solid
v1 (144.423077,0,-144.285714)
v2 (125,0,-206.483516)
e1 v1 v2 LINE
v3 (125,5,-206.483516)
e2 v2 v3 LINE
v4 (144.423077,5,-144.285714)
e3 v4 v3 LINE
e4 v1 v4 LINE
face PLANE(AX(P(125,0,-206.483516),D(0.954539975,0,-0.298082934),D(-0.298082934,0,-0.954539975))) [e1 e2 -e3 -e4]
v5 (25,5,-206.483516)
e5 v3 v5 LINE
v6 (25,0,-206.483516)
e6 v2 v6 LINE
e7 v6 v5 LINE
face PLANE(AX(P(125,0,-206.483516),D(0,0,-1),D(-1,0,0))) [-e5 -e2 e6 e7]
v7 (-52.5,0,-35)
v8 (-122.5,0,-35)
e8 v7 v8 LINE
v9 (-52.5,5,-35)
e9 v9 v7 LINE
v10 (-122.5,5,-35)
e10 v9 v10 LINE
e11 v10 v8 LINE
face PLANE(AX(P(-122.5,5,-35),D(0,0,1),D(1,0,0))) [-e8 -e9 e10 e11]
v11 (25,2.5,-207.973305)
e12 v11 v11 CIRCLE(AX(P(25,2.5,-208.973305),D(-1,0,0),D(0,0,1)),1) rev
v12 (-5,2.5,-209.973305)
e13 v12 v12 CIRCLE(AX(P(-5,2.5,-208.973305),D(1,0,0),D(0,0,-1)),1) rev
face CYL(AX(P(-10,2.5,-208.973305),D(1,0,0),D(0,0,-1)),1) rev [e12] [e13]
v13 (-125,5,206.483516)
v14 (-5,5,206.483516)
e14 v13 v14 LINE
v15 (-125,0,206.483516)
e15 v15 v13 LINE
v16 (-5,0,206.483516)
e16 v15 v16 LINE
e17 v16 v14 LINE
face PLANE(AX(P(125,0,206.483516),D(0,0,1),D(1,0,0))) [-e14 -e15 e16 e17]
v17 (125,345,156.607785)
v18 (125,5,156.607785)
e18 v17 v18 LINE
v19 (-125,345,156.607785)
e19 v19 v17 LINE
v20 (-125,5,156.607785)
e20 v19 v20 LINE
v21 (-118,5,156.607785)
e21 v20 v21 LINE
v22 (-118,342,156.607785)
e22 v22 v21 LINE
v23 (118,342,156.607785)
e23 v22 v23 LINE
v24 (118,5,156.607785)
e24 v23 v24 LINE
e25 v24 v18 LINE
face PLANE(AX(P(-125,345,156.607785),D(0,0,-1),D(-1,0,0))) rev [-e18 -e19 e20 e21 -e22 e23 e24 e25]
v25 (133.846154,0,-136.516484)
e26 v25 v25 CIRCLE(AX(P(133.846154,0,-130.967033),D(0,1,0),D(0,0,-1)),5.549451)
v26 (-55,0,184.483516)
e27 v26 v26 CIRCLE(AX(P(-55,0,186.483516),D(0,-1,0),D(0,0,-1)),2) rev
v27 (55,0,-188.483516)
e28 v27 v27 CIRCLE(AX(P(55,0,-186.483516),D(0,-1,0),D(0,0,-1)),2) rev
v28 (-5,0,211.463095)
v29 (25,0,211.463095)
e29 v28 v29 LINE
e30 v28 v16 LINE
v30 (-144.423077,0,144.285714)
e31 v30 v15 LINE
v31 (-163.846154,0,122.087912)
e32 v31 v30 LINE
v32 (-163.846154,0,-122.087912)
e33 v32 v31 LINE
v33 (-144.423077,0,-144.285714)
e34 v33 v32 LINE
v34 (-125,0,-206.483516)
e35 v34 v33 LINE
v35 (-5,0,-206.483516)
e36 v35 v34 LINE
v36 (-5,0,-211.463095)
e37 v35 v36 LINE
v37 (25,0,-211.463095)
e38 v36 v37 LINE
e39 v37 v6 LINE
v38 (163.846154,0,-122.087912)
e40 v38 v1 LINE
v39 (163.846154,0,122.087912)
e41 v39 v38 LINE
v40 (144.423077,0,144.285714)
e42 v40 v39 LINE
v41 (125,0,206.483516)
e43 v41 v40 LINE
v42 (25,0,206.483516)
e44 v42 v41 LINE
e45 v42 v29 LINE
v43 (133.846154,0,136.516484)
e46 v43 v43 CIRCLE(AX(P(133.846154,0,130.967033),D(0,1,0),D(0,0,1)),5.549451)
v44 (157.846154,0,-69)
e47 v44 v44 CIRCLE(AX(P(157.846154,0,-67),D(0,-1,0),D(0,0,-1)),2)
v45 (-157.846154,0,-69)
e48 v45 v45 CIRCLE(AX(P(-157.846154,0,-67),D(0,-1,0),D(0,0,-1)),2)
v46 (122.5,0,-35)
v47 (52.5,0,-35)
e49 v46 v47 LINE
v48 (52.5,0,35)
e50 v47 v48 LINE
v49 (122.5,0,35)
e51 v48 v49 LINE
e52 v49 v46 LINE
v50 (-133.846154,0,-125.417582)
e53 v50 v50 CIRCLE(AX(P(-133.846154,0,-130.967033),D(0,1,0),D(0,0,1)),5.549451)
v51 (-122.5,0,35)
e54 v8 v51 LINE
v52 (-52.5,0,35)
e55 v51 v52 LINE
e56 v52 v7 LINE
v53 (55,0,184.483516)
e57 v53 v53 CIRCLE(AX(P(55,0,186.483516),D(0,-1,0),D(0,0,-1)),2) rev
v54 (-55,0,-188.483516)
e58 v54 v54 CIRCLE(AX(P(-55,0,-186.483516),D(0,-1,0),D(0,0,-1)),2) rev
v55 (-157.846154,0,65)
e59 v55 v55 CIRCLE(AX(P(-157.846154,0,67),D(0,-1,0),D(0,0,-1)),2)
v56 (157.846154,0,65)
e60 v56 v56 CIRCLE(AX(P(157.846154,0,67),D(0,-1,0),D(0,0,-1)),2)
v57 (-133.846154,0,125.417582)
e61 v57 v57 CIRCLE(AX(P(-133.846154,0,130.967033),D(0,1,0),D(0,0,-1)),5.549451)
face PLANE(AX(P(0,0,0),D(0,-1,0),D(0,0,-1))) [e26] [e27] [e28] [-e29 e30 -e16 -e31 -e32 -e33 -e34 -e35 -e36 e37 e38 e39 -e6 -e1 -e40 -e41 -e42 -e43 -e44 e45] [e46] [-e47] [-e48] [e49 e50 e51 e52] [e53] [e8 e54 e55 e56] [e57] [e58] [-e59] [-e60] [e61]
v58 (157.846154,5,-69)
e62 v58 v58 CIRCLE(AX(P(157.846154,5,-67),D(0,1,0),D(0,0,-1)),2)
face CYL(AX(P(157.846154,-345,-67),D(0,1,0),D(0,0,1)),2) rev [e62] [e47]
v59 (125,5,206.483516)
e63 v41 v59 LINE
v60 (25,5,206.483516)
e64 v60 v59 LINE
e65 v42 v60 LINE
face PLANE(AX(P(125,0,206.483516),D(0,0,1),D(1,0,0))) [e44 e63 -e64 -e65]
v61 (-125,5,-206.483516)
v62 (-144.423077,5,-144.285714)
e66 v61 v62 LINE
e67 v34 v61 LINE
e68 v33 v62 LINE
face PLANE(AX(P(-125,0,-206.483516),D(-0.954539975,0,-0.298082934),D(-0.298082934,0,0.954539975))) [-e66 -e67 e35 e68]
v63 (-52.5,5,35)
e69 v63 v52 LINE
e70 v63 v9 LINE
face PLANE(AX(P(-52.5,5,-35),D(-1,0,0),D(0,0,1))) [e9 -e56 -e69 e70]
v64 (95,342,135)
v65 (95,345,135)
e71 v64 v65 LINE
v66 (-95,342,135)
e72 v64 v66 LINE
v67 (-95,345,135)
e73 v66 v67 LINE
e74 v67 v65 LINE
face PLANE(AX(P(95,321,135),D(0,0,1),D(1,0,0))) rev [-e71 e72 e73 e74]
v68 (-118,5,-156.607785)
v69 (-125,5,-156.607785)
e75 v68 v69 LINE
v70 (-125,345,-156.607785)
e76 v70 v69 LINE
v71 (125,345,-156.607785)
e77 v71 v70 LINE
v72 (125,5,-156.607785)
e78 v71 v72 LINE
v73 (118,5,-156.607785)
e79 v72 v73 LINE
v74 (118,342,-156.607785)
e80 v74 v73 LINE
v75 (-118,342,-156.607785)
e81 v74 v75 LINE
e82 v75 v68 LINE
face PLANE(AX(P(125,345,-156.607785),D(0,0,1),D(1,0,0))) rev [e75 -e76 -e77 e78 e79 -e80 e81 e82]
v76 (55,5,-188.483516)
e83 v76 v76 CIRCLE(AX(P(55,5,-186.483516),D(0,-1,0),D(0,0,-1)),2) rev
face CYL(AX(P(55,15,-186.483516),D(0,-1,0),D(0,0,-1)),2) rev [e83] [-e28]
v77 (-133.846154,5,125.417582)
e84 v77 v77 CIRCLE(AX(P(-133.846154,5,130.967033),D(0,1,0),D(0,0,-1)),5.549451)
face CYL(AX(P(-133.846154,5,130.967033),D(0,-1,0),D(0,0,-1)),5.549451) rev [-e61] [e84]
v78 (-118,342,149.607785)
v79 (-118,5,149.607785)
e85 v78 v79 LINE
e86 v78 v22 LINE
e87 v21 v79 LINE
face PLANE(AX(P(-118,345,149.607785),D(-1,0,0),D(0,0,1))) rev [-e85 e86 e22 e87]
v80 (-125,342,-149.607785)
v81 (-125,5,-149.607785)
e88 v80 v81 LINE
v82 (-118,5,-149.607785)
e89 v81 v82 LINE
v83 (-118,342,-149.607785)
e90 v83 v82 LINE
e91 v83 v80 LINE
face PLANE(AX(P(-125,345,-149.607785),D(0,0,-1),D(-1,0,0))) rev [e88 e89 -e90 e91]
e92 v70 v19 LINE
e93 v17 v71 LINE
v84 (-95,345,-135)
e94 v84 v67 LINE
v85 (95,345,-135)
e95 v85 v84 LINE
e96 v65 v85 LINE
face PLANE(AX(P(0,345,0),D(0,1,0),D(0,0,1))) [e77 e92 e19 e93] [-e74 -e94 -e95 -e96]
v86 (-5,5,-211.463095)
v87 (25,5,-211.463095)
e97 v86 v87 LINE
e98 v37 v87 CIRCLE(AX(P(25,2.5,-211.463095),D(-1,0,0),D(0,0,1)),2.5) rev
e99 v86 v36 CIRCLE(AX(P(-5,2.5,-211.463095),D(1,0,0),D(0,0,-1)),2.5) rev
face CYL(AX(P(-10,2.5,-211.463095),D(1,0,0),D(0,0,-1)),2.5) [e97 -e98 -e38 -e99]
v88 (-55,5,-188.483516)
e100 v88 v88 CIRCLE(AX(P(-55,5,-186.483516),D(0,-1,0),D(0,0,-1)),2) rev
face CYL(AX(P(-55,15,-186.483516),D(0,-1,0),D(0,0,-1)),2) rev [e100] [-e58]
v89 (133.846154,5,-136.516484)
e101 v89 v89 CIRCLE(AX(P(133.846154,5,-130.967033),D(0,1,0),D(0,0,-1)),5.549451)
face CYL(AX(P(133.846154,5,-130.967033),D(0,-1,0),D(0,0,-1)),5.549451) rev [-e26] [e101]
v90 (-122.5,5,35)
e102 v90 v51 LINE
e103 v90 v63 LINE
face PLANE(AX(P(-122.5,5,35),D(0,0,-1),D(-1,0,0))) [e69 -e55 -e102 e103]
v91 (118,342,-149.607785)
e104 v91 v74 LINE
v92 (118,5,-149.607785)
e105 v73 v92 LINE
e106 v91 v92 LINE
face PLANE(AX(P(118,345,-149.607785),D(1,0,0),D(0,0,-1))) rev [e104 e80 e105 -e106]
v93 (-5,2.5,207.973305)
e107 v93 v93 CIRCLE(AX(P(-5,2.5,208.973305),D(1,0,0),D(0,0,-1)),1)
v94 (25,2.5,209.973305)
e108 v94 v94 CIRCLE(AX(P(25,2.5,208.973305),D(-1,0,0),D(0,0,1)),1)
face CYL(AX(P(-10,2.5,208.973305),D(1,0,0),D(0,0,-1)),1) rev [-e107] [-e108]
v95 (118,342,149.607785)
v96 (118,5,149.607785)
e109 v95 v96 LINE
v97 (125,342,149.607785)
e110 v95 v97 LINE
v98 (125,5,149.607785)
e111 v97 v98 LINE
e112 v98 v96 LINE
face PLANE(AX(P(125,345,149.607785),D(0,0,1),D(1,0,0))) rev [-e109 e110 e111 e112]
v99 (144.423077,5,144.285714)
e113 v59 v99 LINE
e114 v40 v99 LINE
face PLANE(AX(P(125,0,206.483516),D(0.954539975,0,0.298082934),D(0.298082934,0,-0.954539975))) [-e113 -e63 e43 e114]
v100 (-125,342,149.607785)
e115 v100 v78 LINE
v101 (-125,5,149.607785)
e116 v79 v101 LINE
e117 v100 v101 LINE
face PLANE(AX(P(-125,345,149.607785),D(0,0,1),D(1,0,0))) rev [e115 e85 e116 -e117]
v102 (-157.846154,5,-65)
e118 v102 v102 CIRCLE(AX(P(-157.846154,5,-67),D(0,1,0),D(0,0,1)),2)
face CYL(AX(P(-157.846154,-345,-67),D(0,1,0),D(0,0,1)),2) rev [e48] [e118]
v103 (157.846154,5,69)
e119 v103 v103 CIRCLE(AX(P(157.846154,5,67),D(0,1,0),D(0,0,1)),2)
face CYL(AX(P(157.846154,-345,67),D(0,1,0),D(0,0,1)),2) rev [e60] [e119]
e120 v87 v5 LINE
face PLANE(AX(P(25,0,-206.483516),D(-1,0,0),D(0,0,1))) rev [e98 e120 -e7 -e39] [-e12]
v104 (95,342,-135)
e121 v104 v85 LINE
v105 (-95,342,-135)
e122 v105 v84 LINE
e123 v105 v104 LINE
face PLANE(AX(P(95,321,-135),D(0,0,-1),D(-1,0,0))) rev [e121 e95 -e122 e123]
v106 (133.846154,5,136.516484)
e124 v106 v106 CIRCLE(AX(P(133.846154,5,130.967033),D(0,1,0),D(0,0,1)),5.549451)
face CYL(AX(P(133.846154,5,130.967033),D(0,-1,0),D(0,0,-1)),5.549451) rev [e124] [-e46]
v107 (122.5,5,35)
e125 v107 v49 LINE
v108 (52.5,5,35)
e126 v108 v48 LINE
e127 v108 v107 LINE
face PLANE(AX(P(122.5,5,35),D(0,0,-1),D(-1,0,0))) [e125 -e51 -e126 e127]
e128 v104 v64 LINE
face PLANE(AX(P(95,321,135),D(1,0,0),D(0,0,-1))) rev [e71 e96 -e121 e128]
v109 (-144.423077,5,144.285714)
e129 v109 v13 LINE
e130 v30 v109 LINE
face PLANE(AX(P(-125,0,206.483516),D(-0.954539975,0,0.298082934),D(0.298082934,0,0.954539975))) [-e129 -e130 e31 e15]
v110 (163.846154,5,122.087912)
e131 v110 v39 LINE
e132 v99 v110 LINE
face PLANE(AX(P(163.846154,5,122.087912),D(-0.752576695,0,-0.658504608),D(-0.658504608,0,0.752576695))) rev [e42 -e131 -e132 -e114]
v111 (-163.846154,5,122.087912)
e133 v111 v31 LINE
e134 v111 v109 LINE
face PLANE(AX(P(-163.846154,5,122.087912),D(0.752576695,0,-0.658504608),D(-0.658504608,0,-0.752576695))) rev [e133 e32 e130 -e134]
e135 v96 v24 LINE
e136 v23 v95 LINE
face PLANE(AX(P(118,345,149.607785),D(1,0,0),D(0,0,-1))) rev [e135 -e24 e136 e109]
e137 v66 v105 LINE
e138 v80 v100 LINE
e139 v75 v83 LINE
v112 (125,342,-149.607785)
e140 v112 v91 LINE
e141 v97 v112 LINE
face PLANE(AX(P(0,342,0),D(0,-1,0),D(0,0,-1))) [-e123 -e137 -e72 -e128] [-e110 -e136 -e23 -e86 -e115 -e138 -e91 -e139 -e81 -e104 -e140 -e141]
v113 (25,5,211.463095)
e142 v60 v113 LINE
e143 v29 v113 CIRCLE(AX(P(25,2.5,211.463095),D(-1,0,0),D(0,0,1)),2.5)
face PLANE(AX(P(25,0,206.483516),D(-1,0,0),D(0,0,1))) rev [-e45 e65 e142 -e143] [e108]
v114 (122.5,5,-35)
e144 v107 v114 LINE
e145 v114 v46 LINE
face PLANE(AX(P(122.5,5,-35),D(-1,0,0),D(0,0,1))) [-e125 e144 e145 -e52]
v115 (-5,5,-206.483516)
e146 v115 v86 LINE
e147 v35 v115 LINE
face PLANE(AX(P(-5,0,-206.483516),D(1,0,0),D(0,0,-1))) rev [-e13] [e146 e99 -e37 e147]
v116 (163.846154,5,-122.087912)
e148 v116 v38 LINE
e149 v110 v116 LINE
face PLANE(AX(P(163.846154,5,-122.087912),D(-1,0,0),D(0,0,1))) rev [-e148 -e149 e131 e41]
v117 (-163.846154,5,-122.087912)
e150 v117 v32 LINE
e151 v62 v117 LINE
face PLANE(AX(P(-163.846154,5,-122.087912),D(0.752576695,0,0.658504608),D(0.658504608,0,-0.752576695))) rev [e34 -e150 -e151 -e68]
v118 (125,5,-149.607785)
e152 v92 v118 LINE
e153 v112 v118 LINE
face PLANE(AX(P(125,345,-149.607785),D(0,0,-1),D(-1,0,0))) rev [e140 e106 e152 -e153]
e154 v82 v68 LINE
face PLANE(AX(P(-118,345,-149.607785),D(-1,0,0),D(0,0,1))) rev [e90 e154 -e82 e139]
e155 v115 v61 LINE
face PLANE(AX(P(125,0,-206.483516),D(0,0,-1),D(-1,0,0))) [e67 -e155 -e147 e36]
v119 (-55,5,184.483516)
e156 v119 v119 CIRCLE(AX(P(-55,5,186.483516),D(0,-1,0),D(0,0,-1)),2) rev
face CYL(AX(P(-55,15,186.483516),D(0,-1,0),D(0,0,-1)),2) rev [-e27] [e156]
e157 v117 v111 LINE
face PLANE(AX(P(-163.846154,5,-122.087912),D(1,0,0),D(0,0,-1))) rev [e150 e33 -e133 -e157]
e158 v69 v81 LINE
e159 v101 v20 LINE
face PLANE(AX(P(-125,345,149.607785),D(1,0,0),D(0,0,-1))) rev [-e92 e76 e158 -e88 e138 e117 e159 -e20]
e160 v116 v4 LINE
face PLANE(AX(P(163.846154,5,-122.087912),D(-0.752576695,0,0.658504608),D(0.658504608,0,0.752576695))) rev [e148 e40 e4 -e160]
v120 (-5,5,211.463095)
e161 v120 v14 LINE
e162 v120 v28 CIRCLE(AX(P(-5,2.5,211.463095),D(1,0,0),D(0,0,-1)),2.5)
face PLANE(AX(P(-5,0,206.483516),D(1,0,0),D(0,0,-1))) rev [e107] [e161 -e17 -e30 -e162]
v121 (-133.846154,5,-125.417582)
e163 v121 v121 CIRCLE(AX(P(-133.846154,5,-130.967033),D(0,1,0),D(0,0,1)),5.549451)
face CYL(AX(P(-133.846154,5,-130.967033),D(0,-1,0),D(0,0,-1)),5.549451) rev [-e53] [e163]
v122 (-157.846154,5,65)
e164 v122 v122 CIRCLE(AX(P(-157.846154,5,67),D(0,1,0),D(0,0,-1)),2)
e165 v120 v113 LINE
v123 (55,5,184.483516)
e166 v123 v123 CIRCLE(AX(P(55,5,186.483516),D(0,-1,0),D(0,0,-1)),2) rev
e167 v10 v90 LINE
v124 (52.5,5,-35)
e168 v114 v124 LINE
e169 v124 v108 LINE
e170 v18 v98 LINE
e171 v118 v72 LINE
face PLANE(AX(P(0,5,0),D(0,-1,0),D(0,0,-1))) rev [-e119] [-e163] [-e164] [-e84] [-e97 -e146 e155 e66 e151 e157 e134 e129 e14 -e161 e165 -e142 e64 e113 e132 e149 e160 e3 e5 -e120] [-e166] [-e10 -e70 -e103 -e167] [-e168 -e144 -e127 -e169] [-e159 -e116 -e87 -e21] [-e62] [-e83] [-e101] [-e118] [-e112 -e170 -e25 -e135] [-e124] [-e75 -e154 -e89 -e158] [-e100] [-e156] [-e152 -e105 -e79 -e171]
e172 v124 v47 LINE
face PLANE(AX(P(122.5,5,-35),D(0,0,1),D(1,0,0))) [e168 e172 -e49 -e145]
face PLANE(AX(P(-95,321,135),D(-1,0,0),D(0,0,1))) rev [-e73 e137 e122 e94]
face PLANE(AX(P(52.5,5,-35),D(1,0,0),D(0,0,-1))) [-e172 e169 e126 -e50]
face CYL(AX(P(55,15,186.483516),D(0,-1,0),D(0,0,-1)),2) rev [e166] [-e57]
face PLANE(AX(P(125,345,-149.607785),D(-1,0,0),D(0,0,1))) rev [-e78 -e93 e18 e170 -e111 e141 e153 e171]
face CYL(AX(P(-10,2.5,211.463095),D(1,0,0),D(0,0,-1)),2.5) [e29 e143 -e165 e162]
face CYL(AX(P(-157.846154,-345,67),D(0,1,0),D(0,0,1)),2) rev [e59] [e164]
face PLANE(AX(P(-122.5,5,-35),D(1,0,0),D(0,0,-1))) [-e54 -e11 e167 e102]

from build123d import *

# Parameters (mm, degrees)
ESQUISSE1_R                  = 5.549450549
ESQUISSE1_W                  = 8
ESQUISSE1_H                  = 94.34065934
ESQUISSE1_W_2                = 70
ESQUISSE1_H_2                = 70
BOSS_EXTRU_1_DEPTH           = 5
ESQUISSE4_R                  = 2
ENL_V_MAT_EXTRU_5_DEPTH      = 350
ESQUISSE9_W                  = 8
ESQUISSE9_H                  = 94.34065934
BOSS_EXTRU_2_DEPTH           = 5
BOSS_EXTRU_4_DEPTH           = 5
ESQUISSE11_W                 = 7
ESQUISSE11_H                 = 7
BOSS_EXTRU_6_DEPTH           = 340
ENL_V_MAT_EXTRU_6_DEPTH      = 10
ENL_V_MAT_EXTRU_6_DEPTH_BACK = 10
ESQUISSE12_R                 = 2
ESQUISSE14_R                 = 1
BOSS_EXTRU_8_DEPTH           = 10
SYM_TRIE1_START              = -10
SYM_TRIE1_OUTLINE_R          = 1
SYM_TRIE1_DEPTH              = 40
ESQUISSE15_W                 = 5
ESQUISSE15_H                 = 10.313810077
ENL_V_MAT_EXTRU_7_DEPTH      = 5
ESQUISSE17_W                 = 250
ESQUISSE17_H                 = 313.215569532
BOSS_EXTRU_9_DEPTH           = 3
ESQUISSE18_W                 = 190
ESQUISSE18_H                 = 270
ENL_V_MAT_EXTRU_8_DEPTH      = 24


# Read off the part's stored shape, not the designer's step: Symétrie1
with BuildPart() as part:
    # Esquisse1 → Boss.-Extru.1 (new body)
    with BuildSketch(Plane(origin=(0, 0, 0), x_dir=(1, 0, 0), z_dir=(0, 1, 0))):
        Polygon((-125, 166.483516484), (125, 166.483516484), (163.846153846, 122.087912088), (163.846153846, -122.087912088), (125, -166.483516484), (-125, -166.483516484), (-163.846153846, -122.087912088), (-163.846153846, 122.087912088), align=None)
        with Locations(Location((-133.846153846, 130.967032967, 0), (0, 0, 270))):
            Circle(ESQUISSE1_R, mode=Mode.SUBTRACT)
        with Locations(Location((-133.846153846, -130.967032967, 0), (0, 0, 90))):
            Circle(ESQUISSE1_R, mode=Mode.SUBTRACT)
        with Locations(Location((133.846153846, -130.967032967, 0), (0, 0, 270))):
            Circle(ESQUISSE1_R, mode=Mode.SUBTRACT)
        with Locations(Location((133.846153846, 130.967032967, 0), (0, 0, 90))):
            Circle(ESQUISSE1_R, mode=Mode.SUBTRACT)
        with Locations((-144, 0)):
            Rectangle(ESQUISSE1_W, ESQUISSE1_H, mode=Mode.SUBTRACT)
        with Locations((87.5, 0)):
            Rectangle(ESQUISSE1_W_2, ESQUISSE1_H_2, mode=Mode.SUBTRACT)
        with Locations((-87.5, 0)):
            Rectangle(ESQUISSE1_W_2, ESQUISSE1_H_2, mode=Mode.SUBTRACT)
        with Locations((144, 0)):
            Rectangle(ESQUISSE1_W, ESQUISSE1_H, mode=Mode.SUBTRACT)
    extrude(amount=BOSS_EXTRU_1_DEPTH)

    # Esquisse4 → Enlèv. mat.-Extru.5 (cut)
    with BuildSketch(Plane(origin=(0, 5, 0), x_dir=(1, 0, 0), z_dir=(0, 1, 0))):
        with Locations(Location((-157.846153846, 67, 0), (0, 0, 270))):
            Circle(ESQUISSE4_R)
        with Locations(Location((157.846153846, 67, 0), (0, 0, 90))):
            Circle(ESQUISSE4_R)
        with Locations(Location((-157.846153846, -67, 0), (0, 0, 90))):
            Circle(ESQUISSE4_R)
        with Locations(Location((157.846153846, -67, 0), (0, 0, 270))):
            Circle(ESQUISSE4_R)
    extrude(amount=-ENL_V_MAT_EXTRU_5_DEPTH, mode=Mode.SUBTRACT)

    # Esquisse9 → Boss.-Extru.2 (add)
    with BuildSketch(Plane(origin=(0, 5, 0), x_dir=(1, 0, 0), z_dir=(0, 1, 0))):
        with Locations((-144, 0)):
            Rectangle(ESQUISSE9_W, ESQUISSE9_H)
        with Locations((144, 0)):
            Rectangle(ESQUISSE9_W, ESQUISSE9_H)
    extrude(amount=-BOSS_EXTRU_2_DEPTH)

    # Esquisse10 → Boss.-Extru.4 (add)
    with BuildSketch(Plane(origin=(0, 5, 0), x_dir=(1, 0, 0), z_dir=(0, 1, 0))):
        Polygon((-125, 206.483516484), (-144.423076923, 144.285714286), (144.423076923, 144.285714286), (125, 206.483516484), align=None)
        Polygon((125, -206.483516484), (144.423076923, -144.285714286), (-144.423076923, -144.285714286), (-125, -206.483516484), align=None)
    extrude(amount=-BOSS_EXTRU_4_DEPTH)

    # Esquisse11 → Boss.-Extru.6 (add)
    with BuildSketch(Plane(origin=(0, 5, 0), x_dir=(1, 0, 0), z_dir=(0, 1, 0))):
        with Locations((121.5, -153.107784766)):
            Rectangle(ESQUISSE11_W, ESQUISSE11_H)
        with Locations((-121.5, -153.107784766)):
            Rectangle(ESQUISSE11_W, ESQUISSE11_H)
        with Locations((121.5, 153.107784766)):
            Rectangle(ESQUISSE11_W, ESQUISSE11_H)
        with Locations((-121.5, 153.107784766)):
            Rectangle(ESQUISSE11_W, ESQUISSE11_H)
    extrude(amount=BOSS_EXTRU_6_DEPTH)

    # Esquisse12 → Enlèv. mat.-Extru.6 (cut, two sides: drawn at the far end of the back side and taken through both)
    with BuildSketch(Plane(origin=(0, 5, 0), x_dir=(1, 0, 0), z_dir=(0, 1, 0)).offset(-ENL_V_MAT_EXTRU_6_DEPTH_BACK)):
        with Locations(Location((-55, 186.483516484, 0), (0, 0, 90))):
            Circle(ESQUISSE12_R)
        with Locations(Location((55, 186.483516484, 0), (0, 0, 90))):
            Circle(ESQUISSE12_R)
        with Locations(Location((55, -186.483516484, 0), (0, 0, 90))):
            Circle(ESQUISSE12_R)
        with Locations(Location((-55, -186.483516484, 0), (0, 0, 90))):
            Circle(ESQUISSE12_R)
    extrude(amount=ENL_V_MAT_EXTRU_6_DEPTH + ENL_V_MAT_EXTRU_6_DEPTH_BACK, mode=Mode.SUBTRACT)

    # Esquisse14 → Boss.-Extru.8 (add, symmetric)
    with BuildSketch(Plane(origin=(0, 0, 0), x_dir=(0, 0, -1), z_dir=(1, 0, 0))):
        with BuildLine():
            Line((206.483516484, 5), (211.463094512, 5))
            ThreePointArc((211.463094512, 5), (213.963094512, 2.5), (211.463094512, 0))
            Line((211.463094512, 0), (206.483516484, 0))
            Line((206.483516484, 0), (206.483516484, 5))
        make_face()
        with Locations((208.973305498, 2.5)):
            Circle(ESQUISSE14_R, mode=Mode.SUBTRACT)
    extrude(amount=BOSS_EXTRU_8_DEPTH, both=True)

    # Symétrie1 outline → Symétrie1 (add)
    # profile 1 of 2: a face of its own
    with BuildSketch(Plane.YZ.offset(SYM_TRIE1_START)):
        with BuildLine():
            Line((0, -206.483516484), (0, -211.463094512))
            ThreePointArc((0, -211.463094512), (2.5, -213.963094512), (5, -211.463094512))
            Line((5, -211.463094512), (5, -206.483516484))
            Line((5, -206.483516484), (0, -206.483516484))
        make_face()
        with Locations((2.5, -208.973305498)):
            Circle(SYM_TRIE1_OUTLINE_R, mode=Mode.SUBTRACT)
    # profile 2 of 2: a face of its own
    with BuildSketch(Plane.YZ.offset(SYM_TRIE1_START)):
        with BuildLine():
            Line((0, 211.463094512), (0, 206.483516484))
            Line((0, 206.483516484), (5, 206.483516484))
            Line((5, 206.483516484), (5, 211.463094512))
            ThreePointArc((5, 211.463094512), (2.5, 213.963094512), (0, 211.463094512))
        make_face()
        with Locations((2.5, 208.973305498)):
            Circle(SYM_TRIE1_OUTLINE_R, mode=Mode.SUBTRACT)
    extrude(amount=SYM_TRIE1_DEPTH)

    # Esquisse15 → Enlèv. mat.-Extru.7 (cut)
    with BuildSketch(Plane(origin=(0, 5, 0), x_dir=(1, 0, 0), z_dir=(0, 1, 0))):
        with Locations((-7.5, 211.640421522)):
            Rectangle(ESQUISSE15_W, ESQUISSE15_H)
        with Locations((27.5, 211.640421522)):
            Rectangle(ESQUISSE15_W, ESQUISSE15_H)
        with Locations((27.5, -211.640421522)):
            Rectangle(ESQUISSE15_W, ESQUISSE15_H)
        with Locations((-7.5, -211.640421522)):
            Rectangle(ESQUISSE15_W, ESQUISSE15_H)
    extrude(amount=-ENL_V_MAT_EXTRU_7_DEPTH, mode=Mode.SUBTRACT)

    # Esquisse17 → Boss.-Extru.9 (add)
    with BuildSketch(Plane(origin=(0, 345, 0), x_dir=(1, 0, 0), z_dir=(0, 1, 0))):
        Rectangle(ESQUISSE17_W, ESQUISSE17_H)
    extrude(amount=-BOSS_EXTRU_9_DEPTH)

    # Esquisse18 → Enlèv. mat.-Extru.8 (cut)
    with BuildSketch(Plane(origin=(0, 345, 0), x_dir=(1, 0, 0), z_dir=(0, 1, 0))):
        Rectangle(ESQUISSE18_W, ESQUISSE18_H)
    extrude(amount=-ENL_V_MAT_EXTRU_8_DEPTH, mode=Mode.SUBTRACT)


solid = part.part
